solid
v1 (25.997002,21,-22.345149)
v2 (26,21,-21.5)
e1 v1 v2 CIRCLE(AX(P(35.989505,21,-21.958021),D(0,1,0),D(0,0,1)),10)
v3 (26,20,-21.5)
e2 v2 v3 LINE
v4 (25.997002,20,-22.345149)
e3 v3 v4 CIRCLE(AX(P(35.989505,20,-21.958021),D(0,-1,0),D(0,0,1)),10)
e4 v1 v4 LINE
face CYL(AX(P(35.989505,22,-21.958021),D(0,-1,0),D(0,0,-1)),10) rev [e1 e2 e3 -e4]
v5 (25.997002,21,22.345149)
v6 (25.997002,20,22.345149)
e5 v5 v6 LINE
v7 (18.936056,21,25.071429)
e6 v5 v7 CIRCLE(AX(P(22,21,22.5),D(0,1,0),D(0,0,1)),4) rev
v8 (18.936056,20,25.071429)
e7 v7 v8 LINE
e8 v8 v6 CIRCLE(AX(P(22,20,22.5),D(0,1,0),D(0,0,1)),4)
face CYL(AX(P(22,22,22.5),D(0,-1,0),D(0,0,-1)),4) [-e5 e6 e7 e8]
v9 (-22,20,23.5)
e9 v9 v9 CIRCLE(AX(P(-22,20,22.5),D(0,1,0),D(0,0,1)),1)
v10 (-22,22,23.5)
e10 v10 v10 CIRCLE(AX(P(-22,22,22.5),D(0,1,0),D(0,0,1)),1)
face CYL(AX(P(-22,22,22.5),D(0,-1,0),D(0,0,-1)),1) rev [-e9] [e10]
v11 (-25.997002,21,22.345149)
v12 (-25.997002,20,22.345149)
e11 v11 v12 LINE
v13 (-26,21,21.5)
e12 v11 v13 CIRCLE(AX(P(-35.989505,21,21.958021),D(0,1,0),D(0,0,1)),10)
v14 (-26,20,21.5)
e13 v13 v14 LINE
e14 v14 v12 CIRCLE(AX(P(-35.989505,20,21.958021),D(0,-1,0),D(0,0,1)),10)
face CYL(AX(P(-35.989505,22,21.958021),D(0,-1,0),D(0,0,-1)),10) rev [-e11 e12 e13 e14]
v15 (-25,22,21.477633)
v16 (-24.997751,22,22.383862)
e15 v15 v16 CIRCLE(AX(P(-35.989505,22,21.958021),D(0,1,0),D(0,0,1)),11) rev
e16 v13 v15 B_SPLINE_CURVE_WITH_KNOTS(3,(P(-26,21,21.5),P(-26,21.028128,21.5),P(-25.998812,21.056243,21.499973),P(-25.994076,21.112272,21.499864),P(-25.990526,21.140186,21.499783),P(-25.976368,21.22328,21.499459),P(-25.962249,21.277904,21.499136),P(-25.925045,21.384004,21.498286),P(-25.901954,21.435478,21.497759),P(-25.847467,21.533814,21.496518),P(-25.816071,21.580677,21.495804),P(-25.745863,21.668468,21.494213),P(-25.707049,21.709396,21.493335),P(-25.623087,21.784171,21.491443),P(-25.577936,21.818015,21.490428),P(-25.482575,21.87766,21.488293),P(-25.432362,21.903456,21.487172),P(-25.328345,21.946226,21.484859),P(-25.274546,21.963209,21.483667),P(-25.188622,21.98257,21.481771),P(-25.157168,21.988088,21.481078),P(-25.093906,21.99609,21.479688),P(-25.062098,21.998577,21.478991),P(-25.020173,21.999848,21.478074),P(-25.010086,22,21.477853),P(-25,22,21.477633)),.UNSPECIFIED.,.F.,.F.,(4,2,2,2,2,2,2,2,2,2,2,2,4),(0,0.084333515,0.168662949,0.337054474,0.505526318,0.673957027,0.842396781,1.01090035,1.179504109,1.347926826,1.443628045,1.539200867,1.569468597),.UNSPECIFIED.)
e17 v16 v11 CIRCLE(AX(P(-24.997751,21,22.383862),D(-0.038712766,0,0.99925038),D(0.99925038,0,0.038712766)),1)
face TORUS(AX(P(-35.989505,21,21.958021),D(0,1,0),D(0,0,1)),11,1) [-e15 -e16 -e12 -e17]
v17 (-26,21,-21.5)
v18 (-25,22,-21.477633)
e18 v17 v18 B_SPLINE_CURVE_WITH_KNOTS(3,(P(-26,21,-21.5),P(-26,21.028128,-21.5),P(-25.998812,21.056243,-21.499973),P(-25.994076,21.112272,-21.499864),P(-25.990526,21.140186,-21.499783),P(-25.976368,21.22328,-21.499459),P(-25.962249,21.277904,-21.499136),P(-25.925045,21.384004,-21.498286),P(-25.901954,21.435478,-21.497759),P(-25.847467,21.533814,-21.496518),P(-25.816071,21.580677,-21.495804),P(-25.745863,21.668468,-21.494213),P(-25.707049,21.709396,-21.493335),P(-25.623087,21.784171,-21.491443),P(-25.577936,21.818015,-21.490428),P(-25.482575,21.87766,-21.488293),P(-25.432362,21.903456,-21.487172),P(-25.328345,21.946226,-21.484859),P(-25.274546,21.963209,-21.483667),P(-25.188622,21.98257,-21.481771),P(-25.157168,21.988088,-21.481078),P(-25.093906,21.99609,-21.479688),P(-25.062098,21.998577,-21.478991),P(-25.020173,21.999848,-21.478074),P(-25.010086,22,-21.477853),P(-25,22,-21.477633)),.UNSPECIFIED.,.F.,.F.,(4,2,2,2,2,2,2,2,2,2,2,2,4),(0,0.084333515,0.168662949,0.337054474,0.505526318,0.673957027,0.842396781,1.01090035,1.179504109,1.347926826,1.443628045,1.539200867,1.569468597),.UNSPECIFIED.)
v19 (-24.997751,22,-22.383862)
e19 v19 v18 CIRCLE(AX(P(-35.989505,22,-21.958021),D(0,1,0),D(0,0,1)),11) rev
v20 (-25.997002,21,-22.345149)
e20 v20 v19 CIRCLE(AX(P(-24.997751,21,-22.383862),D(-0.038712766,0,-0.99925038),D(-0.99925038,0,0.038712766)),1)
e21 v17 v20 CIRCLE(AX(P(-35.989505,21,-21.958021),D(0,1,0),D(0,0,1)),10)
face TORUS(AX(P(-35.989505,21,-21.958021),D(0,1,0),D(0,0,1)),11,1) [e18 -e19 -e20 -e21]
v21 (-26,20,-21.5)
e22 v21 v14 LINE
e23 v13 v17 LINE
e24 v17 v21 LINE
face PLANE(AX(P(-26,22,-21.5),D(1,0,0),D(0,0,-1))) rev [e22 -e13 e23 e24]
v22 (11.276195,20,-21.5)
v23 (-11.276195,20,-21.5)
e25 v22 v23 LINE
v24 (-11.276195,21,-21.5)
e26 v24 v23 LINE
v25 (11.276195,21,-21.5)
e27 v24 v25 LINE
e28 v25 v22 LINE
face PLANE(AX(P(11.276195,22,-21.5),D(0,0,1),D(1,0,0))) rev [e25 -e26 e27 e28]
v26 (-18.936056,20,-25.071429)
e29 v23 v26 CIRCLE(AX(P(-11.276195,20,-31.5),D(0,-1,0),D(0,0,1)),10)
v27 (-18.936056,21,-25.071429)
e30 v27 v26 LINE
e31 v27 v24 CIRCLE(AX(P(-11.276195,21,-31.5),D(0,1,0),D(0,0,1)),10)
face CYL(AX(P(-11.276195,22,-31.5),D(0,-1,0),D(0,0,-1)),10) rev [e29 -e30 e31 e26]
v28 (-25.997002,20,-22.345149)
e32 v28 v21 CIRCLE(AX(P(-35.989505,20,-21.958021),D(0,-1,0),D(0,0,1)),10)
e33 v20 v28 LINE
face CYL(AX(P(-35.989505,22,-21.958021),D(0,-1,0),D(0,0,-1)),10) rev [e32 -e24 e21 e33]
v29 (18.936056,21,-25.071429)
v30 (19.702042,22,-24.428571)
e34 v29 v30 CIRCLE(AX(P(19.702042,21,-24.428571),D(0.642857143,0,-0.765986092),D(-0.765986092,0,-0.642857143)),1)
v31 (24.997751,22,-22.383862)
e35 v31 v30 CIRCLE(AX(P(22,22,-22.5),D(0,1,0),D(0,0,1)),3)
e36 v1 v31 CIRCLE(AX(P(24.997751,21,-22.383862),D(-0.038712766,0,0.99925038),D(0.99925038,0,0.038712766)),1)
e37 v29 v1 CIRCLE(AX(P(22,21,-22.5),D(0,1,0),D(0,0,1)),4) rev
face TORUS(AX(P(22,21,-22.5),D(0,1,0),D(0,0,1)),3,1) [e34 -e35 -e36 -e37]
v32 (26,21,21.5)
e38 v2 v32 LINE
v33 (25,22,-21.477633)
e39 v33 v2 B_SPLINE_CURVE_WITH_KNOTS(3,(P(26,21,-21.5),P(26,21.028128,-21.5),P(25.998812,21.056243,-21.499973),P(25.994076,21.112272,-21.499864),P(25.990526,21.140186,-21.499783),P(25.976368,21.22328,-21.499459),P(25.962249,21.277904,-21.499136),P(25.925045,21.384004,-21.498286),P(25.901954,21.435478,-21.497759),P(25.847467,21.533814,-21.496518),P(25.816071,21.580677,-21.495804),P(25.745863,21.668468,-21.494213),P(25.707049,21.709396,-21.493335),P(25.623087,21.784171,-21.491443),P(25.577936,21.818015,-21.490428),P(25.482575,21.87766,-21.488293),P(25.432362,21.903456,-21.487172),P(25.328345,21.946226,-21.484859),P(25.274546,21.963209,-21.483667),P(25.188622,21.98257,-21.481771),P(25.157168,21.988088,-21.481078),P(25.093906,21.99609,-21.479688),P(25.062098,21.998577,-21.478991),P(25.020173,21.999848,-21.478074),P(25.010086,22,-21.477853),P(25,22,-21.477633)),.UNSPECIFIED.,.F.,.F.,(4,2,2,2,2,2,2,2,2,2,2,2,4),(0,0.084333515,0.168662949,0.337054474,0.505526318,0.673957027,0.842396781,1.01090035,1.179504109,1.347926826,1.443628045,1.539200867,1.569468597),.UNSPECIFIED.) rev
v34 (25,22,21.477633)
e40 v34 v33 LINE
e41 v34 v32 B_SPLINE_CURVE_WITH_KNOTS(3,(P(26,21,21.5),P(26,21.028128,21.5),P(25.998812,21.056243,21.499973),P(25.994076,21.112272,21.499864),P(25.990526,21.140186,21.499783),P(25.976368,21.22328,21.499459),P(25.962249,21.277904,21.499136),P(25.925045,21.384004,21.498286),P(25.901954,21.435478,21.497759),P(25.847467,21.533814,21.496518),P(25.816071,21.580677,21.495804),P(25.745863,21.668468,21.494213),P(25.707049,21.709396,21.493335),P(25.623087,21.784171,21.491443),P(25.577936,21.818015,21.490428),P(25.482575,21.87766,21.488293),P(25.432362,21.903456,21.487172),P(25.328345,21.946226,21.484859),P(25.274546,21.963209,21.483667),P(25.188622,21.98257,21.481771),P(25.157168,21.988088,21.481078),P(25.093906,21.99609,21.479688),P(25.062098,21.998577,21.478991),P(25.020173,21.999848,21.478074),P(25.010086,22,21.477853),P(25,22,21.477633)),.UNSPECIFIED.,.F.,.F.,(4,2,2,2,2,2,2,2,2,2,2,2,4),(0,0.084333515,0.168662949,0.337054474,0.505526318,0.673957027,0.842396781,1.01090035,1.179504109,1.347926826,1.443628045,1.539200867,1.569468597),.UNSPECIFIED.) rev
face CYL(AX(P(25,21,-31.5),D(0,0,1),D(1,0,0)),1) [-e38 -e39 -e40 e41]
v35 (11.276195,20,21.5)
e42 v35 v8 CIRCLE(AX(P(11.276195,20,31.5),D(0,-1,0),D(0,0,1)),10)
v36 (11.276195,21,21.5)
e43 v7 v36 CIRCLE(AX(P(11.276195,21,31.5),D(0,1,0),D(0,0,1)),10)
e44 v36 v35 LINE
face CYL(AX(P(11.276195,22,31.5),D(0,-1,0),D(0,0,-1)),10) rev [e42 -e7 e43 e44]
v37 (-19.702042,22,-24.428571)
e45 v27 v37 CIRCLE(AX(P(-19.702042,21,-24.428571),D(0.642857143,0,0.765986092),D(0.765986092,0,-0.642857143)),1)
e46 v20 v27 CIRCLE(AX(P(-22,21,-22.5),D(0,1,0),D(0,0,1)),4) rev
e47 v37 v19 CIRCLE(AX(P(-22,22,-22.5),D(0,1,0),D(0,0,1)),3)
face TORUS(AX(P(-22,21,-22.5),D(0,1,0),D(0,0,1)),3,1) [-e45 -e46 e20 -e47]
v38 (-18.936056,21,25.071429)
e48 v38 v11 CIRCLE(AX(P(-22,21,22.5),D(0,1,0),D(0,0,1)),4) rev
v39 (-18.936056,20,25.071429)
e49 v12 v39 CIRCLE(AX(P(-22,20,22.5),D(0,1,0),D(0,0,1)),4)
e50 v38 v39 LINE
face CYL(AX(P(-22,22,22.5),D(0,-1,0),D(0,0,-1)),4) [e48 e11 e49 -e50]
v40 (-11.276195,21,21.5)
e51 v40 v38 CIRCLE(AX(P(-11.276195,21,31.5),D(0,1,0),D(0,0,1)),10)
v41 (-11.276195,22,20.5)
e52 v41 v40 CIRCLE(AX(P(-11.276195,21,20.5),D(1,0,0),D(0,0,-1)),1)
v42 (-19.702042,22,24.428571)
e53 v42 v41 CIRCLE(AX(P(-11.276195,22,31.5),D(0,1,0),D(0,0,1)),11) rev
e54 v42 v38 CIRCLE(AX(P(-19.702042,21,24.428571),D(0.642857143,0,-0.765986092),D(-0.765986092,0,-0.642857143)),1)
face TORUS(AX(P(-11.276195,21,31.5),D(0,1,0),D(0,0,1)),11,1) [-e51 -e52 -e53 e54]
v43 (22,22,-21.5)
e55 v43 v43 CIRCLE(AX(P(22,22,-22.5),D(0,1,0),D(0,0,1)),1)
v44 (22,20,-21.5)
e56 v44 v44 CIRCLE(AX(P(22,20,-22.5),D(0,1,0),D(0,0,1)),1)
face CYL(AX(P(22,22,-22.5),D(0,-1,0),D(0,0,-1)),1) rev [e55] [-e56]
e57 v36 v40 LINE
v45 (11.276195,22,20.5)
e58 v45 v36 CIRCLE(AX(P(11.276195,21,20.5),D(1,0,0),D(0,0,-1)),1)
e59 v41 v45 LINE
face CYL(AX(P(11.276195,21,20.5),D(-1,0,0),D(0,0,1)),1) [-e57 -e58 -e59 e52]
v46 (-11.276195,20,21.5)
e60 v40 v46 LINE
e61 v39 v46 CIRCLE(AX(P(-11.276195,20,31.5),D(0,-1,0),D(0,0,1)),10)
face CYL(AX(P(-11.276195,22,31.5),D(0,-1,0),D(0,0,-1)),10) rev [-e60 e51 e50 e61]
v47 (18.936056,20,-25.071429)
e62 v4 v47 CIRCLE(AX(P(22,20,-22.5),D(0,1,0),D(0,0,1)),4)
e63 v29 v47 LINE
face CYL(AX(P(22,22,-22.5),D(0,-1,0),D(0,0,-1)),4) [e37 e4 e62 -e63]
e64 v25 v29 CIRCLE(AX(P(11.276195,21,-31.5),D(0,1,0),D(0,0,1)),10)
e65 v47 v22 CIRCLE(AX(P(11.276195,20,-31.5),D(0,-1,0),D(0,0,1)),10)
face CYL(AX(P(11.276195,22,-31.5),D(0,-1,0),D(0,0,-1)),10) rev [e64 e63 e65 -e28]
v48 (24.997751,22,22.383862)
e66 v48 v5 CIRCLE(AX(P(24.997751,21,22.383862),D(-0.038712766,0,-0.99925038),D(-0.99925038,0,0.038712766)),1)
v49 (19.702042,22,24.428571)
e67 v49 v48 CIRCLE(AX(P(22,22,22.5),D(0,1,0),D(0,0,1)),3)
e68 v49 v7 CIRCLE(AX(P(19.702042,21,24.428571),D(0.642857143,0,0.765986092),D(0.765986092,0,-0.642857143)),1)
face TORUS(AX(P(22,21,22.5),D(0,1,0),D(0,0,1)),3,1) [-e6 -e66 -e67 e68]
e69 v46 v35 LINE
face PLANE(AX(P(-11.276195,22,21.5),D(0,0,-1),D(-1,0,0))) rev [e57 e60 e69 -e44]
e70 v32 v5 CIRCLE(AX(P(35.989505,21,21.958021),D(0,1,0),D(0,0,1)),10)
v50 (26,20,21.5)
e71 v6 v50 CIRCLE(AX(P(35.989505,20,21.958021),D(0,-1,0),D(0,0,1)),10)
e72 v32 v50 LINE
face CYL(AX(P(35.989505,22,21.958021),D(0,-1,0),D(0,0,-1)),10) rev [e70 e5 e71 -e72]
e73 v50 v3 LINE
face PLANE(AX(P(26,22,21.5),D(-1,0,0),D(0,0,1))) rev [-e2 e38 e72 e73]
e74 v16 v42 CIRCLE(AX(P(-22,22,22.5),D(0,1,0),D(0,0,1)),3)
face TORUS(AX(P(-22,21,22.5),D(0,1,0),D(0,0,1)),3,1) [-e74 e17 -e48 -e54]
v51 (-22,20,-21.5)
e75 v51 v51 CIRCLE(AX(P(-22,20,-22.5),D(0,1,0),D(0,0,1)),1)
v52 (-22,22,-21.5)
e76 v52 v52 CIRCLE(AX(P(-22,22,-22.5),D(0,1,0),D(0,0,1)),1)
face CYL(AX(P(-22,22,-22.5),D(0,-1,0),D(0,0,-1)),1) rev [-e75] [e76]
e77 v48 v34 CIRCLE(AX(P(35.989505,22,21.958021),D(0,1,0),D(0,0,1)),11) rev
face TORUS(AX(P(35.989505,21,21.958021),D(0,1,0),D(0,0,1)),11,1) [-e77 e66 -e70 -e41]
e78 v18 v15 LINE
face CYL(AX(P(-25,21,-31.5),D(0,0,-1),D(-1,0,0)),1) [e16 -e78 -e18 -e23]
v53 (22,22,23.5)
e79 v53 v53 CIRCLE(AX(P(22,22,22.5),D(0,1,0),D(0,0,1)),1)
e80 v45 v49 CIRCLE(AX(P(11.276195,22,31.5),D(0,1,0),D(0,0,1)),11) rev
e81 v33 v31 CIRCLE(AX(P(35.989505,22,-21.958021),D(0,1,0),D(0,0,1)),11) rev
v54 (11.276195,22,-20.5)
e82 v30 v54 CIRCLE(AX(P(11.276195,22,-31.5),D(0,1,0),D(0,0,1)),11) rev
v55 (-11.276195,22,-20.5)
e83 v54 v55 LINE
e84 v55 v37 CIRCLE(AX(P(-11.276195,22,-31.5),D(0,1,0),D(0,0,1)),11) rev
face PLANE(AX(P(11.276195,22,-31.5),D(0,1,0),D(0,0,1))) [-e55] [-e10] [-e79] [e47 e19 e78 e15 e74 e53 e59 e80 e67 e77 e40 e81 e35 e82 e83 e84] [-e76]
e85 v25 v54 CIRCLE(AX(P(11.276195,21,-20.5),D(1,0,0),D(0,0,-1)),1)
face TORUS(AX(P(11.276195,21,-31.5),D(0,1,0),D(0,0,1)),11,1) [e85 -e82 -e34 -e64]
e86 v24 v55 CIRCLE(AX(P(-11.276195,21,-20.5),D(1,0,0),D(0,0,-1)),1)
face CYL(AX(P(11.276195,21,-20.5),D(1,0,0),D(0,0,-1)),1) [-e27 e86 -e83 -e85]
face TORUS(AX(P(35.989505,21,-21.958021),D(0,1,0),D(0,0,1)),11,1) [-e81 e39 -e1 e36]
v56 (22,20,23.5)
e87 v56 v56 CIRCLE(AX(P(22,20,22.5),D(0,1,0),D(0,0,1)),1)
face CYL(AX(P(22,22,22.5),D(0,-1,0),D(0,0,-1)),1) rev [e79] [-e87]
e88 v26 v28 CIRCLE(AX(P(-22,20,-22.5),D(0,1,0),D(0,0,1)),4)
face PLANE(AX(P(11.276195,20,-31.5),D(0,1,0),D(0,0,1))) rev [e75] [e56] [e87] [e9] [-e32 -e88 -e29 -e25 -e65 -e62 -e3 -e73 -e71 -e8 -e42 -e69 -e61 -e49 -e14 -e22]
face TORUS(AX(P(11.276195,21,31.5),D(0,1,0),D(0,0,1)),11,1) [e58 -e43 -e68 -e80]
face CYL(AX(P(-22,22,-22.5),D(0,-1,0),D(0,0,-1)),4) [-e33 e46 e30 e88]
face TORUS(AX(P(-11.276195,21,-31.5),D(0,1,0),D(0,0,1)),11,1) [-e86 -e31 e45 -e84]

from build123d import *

# Parameters (mm, degrees)
SKETCH1_R           = 1
BOSS_EXTRUDE1_DEPTH = 2
FILLET1_R           = 1


with BuildPart() as part:
    # Sketch1 → Boss-Extrude1 (new body)
    with BuildSketch(Plane(origin=(0, 20, 0), x_dir=(1, 0, 0), z_dir=(0, 1, 0))):
        with BuildLine():
            Line((11.276194705, 21.5), (-11.276194705, 21.5))
            ThreePointArc((-11.276194705, 21.5), (-15.501965979, 22.436730328), (-18.93605563, 25.071428571))
            ThreePointArc((-18.93605563, 25.071428571), (-23.440763365, 26.231514562), (-25.99700152, 22.345148936))
            ThreePointArc((-25.99700152, 22.345148936), (-25.989568255, 21.922542776), (-26, 21.5))
            Line((-26, 21.5), (-26, -21.5))
            ThreePointArc((-26, -21.5), (-25.989568255, -21.922542776), (-25.99700152, -22.345148936))
            ThreePointArc((-25.99700152, -22.345148936), (-23.440763365, -26.231514562), (-18.93605563, -25.071428571))
            ThreePointArc((-18.93605563, -25.071428571), (-15.501965979, -22.436730328), (-11.276194705, -21.5))
            Line((-11.276194705, -21.5), (11.276194705, -21.5))
            ThreePointArc((11.276194705, -21.5), (15.501965979, -22.436730328), (18.93605563, -25.071428571))
            ThreePointArc((18.93605563, -25.071428571), (23.440763365, -26.231514562), (25.99700152, -22.345148936))
            ThreePointArc((25.99700152, -22.345148936), (25.989568255, -21.922542776), (26, -21.5))
            Line((26, -21.5), (26, 21.5))
            ThreePointArc((26, 21.5), (25.989568255, 21.922542776), (25.99700152, 22.345148936))
            ThreePointArc((25.99700152, 22.345148936), (23.440763365, 26.231514562), (18.93605563, 25.071428571))
            ThreePointArc((18.93605563, 25.071428571), (15.501965979, 22.436730328), (11.276194705, 21.5))
        make_face()
        with Locations(Location((-22, -22.5, 0), (0, 0, 270))):
            Circle(SKETCH1_R, mode=Mode.SUBTRACT)
        with Locations(Location((22, -22.5, 0), (0, 0, 270))):
            Circle(SKETCH1_R, mode=Mode.SUBTRACT)
        with Locations(Location((22, 22.5, 0), (0, 0, 270))):
            Circle(SKETCH1_R, mode=Mode.SUBTRACT)
        with Locations(Location((-22, 22.5, 0), (0, 0, 270))):
            Circle(SKETCH1_R, mode=Mode.SUBTRACT)
    extrude(amount=BOSS_EXTRUDE1_DEPTH)

    # Fillet1
    # the kernel refuses this fillet: 1 mm, written as the material it takes off along each edge
    with BuildSketch(Plane(origin=(-11.276194705, 22, -31.5), x_dir=(0, 0, 1), z_dir=(1, 0, 0))) as fillet1_piece_1:
        with BuildLine():
            CenterArc((10 + FILLET1_R, FILLET1_R), FILLET1_R, 180, 90)
            Line((10 + FILLET1_R, 0), (10, 0))
            Line((10, 0), (10, FILLET1_R))
        make_face()
    revolve(axis=Axis((-11.276194705, 22, -31.5), (0, -1, 0)), revolution_arc=49.994799115, mode=Mode.SUBTRACT)
    with BuildSketch(Plane(origin=(-22, 22, -22.5), x_dir=(0.7659860924831153, 0, -0.6428571428571425), z_dir=(0.6428571428571425, 0, 0.7659860924831153))) as fillet1_piece_2:
        with BuildLine():
            CenterArc((4 - FILLET1_R, -FILLET1_R), FILLET1_R, 0, 90)
            Line((4 - FILLET1_R, 0), (4, 0))
            Line((4, 0), (4, -FILLET1_R))
        make_face()
    revolve(axis=Axis((-22, 22, -22.5), (0, 1, 0)), revolution_arc=142.21343163, mode=Mode.SUBTRACT)
    with BuildSketch(Plane(origin=(-35.989505319, 22, -21.958021275), x_dir=(0.999250379905618, 0, -0.03871276609179466), z_dir=(-0.03871276609179466, 0, -0.999250379905618))) as fillet1_piece_3:
        with BuildLine():
            CenterArc((10 + FILLET1_R, FILLET1_R), FILLET1_R, 180, 90)
            Line((10 + FILLET1_R, 0), (10, 0))
            Line((10, 0), (10, FILLET1_R))
        make_face()
    revolve(axis=Axis((-35.989505319, 22, -21.958021275), (0, -1, 0)), revolution_arc=19.167781067, mode=Mode.SUBTRACT)
    with BuildSketch(Plane(origin=(-26, 22, -24), x_dir=(0, -1, 0), z_dir=(0, 0, 1)), Plane(origin=(26, 22, 24), x_dir=(0, -1, 0), z_dir=(0, 0, -1))) as fillet1_piece_4:
        with BuildLine():
            CenterArc((FILLET1_R, FILLET1_R), FILLET1_R, 180, 90)
            Line((0, FILLET1_R), (0, 0))
            Line((0, 0), (FILLET1_R, 0))
        make_face()
    extrude(amount=48, mode=Mode.SUBTRACT)
    with BuildSketch(Plane(origin=(-35.989505319, 22, 21.958021275), x_dir=(0.9565638665427638, 0, -0.2915228451163944), z_dir=(-0.2915228451163944, 0, -0.9565638665427638))) as fillet1_piece_5:
        with BuildLine():
            CenterArc((10 + FILLET1_R, FILLET1_R), FILLET1_R, 180, 90)
            Line((10 + FILLET1_R, 0), (10, 0))
            Line((10, 0), (10, FILLET1_R))
        make_face()
    revolve(axis=Axis((-35.989505319, 22, 21.958021275), (0, -1, 0)), revolution_arc=19.167781067, mode=Mode.SUBTRACT)
    with BuildSketch(Plane(origin=(-22, 22, 22.5), x_dir=(-0.9992503799056173, 0, -0.03871276609181696), z_dir=(0.03871276609181696, 0, -0.9992503799056173))) as fillet1_piece_6:
        with BuildLine():
            CenterArc((4 - FILLET1_R, -FILLET1_R), FILLET1_R, 0, 90)
            Line((4 - FILLET1_R, 0), (4, 0))
            Line((4, 0), (4, -FILLET1_R))
        make_face()
    revolve(axis=Axis((-22, 22, 22.5), (0, 1, 0)), revolution_arc=142.21343163, mode=Mode.SUBTRACT)
    with BuildSketch(Plane(origin=(-11.276194705, 22, 31.5), x_dir=(-0.7659860924831162, 0, -0.6428571428571414), z_dir=(-0.6428571428571414, 0, 0.7659860924831162))) as fillet1_piece_7:
        with BuildLine():
            CenterArc((10 + FILLET1_R, FILLET1_R), FILLET1_R, 180, 90)
            Line((10 + FILLET1_R, 0), (10, 0))
            Line((10, 0), (10, FILLET1_R))
        make_face()
    revolve(axis=Axis((-11.276194705, 22, 31.5), (0, -1, 0)), revolution_arc=49.994799115, mode=Mode.SUBTRACT)
    with BuildSketch(Plane(origin=(-11.276194705, 22, 21.5), x_dir=(0, -1, 0), z_dir=(1, 0, 0)), Plane(origin=(11.276194705, 22, -21.5), x_dir=(0, -1, 0), z_dir=(-1, 0, 0))) as fillet1_piece_8:
        with BuildLine():
            CenterArc((FILLET1_R, FILLET1_R), FILLET1_R, 180, 90)
            Line((0, FILLET1_R), (0, 0))
            Line((0, 0), (FILLET1_R, 0))
        make_face()
    extrude(amount=22.55238941, mode=Mode.SUBTRACT)
    with BuildSketch(Plane(origin=(11.276194705, 22, 31.5), x_dir=(0, 0, -1), z_dir=(-1, 0, 0))) as fillet1_piece_9:
        with BuildLine():
            CenterArc((10 + FILLET1_R, FILLET1_R), FILLET1_R, 180, 90)
            Line((10 + FILLET1_R, 0), (10, 0))
            Line((10, 0), (10, FILLET1_R))
        make_face()
    revolve(axis=Axis((11.276194705, 22, 31.5), (0, -1, 0)), revolution_arc=49.994799115, mode=Mode.SUBTRACT)
    with BuildSketch(Plane(origin=(22, 22, 22.5), x_dir=(-0.7659860924831153, 0, 0.6428571428571425), z_dir=(-0.6428571428571425, 0, -0.7659860924831153))) as fillet1_piece_10:
        with BuildLine():
            CenterArc((4 - FILLET1_R, -FILLET1_R), FILLET1_R, 0, 90)
            Line((4 - FILLET1_R, 0), (4, 0))
            Line((4, 0), (4, -FILLET1_R))
        make_face()
    revolve(axis=Axis((22, 22, 22.5), (0, 1, 0)), revolution_arc=142.21343163, mode=Mode.SUBTRACT)
    with BuildSketch(Plane(origin=(11.276194705, 22, -31.5), x_dir=(0.7659860924831151, 0, 0.6428571428571426), z_dir=(0.6428571428571426, 0, -0.7659860924831151))) as fillet1_piece_11:
        with BuildLine():
            CenterArc((10 + FILLET1_R, FILLET1_R), FILLET1_R, 180, 90)
            Line((10 + FILLET1_R, 0), (10, 0))
            Line((10, 0), (10, FILLET1_R))
        make_face()
    revolve(axis=Axis((11.276194705, 22, -31.5), (0, -1, 0)), revolution_arc=49.994799115, mode=Mode.SUBTRACT)
    with BuildSketch(Plane(origin=(35.989505319, 22, 21.958021275), x_dir=(-0.999250379905617, 0, 0.03871276609181962), z_dir=(0.03871276609181962, 0, 0.999250379905617))) as fillet1_piece_12:
        with BuildLine():
            CenterArc((10 + FILLET1_R, FILLET1_R), FILLET1_R, 180, 90)
            Line((10 + FILLET1_R, 0), (10, 0))
            Line((10, 0), (10, FILLET1_R))
        make_face()
    revolve(axis=Axis((35.989505319, 22, 21.958021275), (0, -1, 0)), revolution_arc=19.167781067, mode=Mode.SUBTRACT)
    with BuildSketch(Plane(origin=(35.989505319, 22, -21.958021275), x_dir=(-0.9565638665427474, 0, 0.2915228451164487), z_dir=(0.2915228451164487, 0, 0.9565638665427474))) as fillet1_piece_13:
        with BuildLine():
            CenterArc((10 + FILLET1_R, FILLET1_R), FILLET1_R, 180, 90)
            Line((10 + FILLET1_R, 0), (10, 0))
            Line((10, 0), (10, FILLET1_R))
        make_face()
    revolve(axis=Axis((35.989505319, 22, -21.958021275), (0, -1, 0)), revolution_arc=19.167781067, mode=Mode.SUBTRACT)
    with BuildSketch(Plane(origin=(22, 22, -22.5), x_dir=(0.9992503799056174, 0, 0.038712766091811596), z_dir=(-0.038712766091811596, 0, 0.9992503799056174))) as fillet1_piece_14:
        with BuildLine():
            CenterArc((4 - FILLET1_R, -FILLET1_R), FILLET1_R, 0, 90)
            Line((4 - FILLET1_R, 0), (4, 0))
            Line((4, 0), (4, -FILLET1_R))
        make_face()
    revolve(axis=Axis((22, 22, -22.5), (0, 1, 0)), revolution_arc=142.21343163, mode=Mode.SUBTRACT)


solid = part.part
